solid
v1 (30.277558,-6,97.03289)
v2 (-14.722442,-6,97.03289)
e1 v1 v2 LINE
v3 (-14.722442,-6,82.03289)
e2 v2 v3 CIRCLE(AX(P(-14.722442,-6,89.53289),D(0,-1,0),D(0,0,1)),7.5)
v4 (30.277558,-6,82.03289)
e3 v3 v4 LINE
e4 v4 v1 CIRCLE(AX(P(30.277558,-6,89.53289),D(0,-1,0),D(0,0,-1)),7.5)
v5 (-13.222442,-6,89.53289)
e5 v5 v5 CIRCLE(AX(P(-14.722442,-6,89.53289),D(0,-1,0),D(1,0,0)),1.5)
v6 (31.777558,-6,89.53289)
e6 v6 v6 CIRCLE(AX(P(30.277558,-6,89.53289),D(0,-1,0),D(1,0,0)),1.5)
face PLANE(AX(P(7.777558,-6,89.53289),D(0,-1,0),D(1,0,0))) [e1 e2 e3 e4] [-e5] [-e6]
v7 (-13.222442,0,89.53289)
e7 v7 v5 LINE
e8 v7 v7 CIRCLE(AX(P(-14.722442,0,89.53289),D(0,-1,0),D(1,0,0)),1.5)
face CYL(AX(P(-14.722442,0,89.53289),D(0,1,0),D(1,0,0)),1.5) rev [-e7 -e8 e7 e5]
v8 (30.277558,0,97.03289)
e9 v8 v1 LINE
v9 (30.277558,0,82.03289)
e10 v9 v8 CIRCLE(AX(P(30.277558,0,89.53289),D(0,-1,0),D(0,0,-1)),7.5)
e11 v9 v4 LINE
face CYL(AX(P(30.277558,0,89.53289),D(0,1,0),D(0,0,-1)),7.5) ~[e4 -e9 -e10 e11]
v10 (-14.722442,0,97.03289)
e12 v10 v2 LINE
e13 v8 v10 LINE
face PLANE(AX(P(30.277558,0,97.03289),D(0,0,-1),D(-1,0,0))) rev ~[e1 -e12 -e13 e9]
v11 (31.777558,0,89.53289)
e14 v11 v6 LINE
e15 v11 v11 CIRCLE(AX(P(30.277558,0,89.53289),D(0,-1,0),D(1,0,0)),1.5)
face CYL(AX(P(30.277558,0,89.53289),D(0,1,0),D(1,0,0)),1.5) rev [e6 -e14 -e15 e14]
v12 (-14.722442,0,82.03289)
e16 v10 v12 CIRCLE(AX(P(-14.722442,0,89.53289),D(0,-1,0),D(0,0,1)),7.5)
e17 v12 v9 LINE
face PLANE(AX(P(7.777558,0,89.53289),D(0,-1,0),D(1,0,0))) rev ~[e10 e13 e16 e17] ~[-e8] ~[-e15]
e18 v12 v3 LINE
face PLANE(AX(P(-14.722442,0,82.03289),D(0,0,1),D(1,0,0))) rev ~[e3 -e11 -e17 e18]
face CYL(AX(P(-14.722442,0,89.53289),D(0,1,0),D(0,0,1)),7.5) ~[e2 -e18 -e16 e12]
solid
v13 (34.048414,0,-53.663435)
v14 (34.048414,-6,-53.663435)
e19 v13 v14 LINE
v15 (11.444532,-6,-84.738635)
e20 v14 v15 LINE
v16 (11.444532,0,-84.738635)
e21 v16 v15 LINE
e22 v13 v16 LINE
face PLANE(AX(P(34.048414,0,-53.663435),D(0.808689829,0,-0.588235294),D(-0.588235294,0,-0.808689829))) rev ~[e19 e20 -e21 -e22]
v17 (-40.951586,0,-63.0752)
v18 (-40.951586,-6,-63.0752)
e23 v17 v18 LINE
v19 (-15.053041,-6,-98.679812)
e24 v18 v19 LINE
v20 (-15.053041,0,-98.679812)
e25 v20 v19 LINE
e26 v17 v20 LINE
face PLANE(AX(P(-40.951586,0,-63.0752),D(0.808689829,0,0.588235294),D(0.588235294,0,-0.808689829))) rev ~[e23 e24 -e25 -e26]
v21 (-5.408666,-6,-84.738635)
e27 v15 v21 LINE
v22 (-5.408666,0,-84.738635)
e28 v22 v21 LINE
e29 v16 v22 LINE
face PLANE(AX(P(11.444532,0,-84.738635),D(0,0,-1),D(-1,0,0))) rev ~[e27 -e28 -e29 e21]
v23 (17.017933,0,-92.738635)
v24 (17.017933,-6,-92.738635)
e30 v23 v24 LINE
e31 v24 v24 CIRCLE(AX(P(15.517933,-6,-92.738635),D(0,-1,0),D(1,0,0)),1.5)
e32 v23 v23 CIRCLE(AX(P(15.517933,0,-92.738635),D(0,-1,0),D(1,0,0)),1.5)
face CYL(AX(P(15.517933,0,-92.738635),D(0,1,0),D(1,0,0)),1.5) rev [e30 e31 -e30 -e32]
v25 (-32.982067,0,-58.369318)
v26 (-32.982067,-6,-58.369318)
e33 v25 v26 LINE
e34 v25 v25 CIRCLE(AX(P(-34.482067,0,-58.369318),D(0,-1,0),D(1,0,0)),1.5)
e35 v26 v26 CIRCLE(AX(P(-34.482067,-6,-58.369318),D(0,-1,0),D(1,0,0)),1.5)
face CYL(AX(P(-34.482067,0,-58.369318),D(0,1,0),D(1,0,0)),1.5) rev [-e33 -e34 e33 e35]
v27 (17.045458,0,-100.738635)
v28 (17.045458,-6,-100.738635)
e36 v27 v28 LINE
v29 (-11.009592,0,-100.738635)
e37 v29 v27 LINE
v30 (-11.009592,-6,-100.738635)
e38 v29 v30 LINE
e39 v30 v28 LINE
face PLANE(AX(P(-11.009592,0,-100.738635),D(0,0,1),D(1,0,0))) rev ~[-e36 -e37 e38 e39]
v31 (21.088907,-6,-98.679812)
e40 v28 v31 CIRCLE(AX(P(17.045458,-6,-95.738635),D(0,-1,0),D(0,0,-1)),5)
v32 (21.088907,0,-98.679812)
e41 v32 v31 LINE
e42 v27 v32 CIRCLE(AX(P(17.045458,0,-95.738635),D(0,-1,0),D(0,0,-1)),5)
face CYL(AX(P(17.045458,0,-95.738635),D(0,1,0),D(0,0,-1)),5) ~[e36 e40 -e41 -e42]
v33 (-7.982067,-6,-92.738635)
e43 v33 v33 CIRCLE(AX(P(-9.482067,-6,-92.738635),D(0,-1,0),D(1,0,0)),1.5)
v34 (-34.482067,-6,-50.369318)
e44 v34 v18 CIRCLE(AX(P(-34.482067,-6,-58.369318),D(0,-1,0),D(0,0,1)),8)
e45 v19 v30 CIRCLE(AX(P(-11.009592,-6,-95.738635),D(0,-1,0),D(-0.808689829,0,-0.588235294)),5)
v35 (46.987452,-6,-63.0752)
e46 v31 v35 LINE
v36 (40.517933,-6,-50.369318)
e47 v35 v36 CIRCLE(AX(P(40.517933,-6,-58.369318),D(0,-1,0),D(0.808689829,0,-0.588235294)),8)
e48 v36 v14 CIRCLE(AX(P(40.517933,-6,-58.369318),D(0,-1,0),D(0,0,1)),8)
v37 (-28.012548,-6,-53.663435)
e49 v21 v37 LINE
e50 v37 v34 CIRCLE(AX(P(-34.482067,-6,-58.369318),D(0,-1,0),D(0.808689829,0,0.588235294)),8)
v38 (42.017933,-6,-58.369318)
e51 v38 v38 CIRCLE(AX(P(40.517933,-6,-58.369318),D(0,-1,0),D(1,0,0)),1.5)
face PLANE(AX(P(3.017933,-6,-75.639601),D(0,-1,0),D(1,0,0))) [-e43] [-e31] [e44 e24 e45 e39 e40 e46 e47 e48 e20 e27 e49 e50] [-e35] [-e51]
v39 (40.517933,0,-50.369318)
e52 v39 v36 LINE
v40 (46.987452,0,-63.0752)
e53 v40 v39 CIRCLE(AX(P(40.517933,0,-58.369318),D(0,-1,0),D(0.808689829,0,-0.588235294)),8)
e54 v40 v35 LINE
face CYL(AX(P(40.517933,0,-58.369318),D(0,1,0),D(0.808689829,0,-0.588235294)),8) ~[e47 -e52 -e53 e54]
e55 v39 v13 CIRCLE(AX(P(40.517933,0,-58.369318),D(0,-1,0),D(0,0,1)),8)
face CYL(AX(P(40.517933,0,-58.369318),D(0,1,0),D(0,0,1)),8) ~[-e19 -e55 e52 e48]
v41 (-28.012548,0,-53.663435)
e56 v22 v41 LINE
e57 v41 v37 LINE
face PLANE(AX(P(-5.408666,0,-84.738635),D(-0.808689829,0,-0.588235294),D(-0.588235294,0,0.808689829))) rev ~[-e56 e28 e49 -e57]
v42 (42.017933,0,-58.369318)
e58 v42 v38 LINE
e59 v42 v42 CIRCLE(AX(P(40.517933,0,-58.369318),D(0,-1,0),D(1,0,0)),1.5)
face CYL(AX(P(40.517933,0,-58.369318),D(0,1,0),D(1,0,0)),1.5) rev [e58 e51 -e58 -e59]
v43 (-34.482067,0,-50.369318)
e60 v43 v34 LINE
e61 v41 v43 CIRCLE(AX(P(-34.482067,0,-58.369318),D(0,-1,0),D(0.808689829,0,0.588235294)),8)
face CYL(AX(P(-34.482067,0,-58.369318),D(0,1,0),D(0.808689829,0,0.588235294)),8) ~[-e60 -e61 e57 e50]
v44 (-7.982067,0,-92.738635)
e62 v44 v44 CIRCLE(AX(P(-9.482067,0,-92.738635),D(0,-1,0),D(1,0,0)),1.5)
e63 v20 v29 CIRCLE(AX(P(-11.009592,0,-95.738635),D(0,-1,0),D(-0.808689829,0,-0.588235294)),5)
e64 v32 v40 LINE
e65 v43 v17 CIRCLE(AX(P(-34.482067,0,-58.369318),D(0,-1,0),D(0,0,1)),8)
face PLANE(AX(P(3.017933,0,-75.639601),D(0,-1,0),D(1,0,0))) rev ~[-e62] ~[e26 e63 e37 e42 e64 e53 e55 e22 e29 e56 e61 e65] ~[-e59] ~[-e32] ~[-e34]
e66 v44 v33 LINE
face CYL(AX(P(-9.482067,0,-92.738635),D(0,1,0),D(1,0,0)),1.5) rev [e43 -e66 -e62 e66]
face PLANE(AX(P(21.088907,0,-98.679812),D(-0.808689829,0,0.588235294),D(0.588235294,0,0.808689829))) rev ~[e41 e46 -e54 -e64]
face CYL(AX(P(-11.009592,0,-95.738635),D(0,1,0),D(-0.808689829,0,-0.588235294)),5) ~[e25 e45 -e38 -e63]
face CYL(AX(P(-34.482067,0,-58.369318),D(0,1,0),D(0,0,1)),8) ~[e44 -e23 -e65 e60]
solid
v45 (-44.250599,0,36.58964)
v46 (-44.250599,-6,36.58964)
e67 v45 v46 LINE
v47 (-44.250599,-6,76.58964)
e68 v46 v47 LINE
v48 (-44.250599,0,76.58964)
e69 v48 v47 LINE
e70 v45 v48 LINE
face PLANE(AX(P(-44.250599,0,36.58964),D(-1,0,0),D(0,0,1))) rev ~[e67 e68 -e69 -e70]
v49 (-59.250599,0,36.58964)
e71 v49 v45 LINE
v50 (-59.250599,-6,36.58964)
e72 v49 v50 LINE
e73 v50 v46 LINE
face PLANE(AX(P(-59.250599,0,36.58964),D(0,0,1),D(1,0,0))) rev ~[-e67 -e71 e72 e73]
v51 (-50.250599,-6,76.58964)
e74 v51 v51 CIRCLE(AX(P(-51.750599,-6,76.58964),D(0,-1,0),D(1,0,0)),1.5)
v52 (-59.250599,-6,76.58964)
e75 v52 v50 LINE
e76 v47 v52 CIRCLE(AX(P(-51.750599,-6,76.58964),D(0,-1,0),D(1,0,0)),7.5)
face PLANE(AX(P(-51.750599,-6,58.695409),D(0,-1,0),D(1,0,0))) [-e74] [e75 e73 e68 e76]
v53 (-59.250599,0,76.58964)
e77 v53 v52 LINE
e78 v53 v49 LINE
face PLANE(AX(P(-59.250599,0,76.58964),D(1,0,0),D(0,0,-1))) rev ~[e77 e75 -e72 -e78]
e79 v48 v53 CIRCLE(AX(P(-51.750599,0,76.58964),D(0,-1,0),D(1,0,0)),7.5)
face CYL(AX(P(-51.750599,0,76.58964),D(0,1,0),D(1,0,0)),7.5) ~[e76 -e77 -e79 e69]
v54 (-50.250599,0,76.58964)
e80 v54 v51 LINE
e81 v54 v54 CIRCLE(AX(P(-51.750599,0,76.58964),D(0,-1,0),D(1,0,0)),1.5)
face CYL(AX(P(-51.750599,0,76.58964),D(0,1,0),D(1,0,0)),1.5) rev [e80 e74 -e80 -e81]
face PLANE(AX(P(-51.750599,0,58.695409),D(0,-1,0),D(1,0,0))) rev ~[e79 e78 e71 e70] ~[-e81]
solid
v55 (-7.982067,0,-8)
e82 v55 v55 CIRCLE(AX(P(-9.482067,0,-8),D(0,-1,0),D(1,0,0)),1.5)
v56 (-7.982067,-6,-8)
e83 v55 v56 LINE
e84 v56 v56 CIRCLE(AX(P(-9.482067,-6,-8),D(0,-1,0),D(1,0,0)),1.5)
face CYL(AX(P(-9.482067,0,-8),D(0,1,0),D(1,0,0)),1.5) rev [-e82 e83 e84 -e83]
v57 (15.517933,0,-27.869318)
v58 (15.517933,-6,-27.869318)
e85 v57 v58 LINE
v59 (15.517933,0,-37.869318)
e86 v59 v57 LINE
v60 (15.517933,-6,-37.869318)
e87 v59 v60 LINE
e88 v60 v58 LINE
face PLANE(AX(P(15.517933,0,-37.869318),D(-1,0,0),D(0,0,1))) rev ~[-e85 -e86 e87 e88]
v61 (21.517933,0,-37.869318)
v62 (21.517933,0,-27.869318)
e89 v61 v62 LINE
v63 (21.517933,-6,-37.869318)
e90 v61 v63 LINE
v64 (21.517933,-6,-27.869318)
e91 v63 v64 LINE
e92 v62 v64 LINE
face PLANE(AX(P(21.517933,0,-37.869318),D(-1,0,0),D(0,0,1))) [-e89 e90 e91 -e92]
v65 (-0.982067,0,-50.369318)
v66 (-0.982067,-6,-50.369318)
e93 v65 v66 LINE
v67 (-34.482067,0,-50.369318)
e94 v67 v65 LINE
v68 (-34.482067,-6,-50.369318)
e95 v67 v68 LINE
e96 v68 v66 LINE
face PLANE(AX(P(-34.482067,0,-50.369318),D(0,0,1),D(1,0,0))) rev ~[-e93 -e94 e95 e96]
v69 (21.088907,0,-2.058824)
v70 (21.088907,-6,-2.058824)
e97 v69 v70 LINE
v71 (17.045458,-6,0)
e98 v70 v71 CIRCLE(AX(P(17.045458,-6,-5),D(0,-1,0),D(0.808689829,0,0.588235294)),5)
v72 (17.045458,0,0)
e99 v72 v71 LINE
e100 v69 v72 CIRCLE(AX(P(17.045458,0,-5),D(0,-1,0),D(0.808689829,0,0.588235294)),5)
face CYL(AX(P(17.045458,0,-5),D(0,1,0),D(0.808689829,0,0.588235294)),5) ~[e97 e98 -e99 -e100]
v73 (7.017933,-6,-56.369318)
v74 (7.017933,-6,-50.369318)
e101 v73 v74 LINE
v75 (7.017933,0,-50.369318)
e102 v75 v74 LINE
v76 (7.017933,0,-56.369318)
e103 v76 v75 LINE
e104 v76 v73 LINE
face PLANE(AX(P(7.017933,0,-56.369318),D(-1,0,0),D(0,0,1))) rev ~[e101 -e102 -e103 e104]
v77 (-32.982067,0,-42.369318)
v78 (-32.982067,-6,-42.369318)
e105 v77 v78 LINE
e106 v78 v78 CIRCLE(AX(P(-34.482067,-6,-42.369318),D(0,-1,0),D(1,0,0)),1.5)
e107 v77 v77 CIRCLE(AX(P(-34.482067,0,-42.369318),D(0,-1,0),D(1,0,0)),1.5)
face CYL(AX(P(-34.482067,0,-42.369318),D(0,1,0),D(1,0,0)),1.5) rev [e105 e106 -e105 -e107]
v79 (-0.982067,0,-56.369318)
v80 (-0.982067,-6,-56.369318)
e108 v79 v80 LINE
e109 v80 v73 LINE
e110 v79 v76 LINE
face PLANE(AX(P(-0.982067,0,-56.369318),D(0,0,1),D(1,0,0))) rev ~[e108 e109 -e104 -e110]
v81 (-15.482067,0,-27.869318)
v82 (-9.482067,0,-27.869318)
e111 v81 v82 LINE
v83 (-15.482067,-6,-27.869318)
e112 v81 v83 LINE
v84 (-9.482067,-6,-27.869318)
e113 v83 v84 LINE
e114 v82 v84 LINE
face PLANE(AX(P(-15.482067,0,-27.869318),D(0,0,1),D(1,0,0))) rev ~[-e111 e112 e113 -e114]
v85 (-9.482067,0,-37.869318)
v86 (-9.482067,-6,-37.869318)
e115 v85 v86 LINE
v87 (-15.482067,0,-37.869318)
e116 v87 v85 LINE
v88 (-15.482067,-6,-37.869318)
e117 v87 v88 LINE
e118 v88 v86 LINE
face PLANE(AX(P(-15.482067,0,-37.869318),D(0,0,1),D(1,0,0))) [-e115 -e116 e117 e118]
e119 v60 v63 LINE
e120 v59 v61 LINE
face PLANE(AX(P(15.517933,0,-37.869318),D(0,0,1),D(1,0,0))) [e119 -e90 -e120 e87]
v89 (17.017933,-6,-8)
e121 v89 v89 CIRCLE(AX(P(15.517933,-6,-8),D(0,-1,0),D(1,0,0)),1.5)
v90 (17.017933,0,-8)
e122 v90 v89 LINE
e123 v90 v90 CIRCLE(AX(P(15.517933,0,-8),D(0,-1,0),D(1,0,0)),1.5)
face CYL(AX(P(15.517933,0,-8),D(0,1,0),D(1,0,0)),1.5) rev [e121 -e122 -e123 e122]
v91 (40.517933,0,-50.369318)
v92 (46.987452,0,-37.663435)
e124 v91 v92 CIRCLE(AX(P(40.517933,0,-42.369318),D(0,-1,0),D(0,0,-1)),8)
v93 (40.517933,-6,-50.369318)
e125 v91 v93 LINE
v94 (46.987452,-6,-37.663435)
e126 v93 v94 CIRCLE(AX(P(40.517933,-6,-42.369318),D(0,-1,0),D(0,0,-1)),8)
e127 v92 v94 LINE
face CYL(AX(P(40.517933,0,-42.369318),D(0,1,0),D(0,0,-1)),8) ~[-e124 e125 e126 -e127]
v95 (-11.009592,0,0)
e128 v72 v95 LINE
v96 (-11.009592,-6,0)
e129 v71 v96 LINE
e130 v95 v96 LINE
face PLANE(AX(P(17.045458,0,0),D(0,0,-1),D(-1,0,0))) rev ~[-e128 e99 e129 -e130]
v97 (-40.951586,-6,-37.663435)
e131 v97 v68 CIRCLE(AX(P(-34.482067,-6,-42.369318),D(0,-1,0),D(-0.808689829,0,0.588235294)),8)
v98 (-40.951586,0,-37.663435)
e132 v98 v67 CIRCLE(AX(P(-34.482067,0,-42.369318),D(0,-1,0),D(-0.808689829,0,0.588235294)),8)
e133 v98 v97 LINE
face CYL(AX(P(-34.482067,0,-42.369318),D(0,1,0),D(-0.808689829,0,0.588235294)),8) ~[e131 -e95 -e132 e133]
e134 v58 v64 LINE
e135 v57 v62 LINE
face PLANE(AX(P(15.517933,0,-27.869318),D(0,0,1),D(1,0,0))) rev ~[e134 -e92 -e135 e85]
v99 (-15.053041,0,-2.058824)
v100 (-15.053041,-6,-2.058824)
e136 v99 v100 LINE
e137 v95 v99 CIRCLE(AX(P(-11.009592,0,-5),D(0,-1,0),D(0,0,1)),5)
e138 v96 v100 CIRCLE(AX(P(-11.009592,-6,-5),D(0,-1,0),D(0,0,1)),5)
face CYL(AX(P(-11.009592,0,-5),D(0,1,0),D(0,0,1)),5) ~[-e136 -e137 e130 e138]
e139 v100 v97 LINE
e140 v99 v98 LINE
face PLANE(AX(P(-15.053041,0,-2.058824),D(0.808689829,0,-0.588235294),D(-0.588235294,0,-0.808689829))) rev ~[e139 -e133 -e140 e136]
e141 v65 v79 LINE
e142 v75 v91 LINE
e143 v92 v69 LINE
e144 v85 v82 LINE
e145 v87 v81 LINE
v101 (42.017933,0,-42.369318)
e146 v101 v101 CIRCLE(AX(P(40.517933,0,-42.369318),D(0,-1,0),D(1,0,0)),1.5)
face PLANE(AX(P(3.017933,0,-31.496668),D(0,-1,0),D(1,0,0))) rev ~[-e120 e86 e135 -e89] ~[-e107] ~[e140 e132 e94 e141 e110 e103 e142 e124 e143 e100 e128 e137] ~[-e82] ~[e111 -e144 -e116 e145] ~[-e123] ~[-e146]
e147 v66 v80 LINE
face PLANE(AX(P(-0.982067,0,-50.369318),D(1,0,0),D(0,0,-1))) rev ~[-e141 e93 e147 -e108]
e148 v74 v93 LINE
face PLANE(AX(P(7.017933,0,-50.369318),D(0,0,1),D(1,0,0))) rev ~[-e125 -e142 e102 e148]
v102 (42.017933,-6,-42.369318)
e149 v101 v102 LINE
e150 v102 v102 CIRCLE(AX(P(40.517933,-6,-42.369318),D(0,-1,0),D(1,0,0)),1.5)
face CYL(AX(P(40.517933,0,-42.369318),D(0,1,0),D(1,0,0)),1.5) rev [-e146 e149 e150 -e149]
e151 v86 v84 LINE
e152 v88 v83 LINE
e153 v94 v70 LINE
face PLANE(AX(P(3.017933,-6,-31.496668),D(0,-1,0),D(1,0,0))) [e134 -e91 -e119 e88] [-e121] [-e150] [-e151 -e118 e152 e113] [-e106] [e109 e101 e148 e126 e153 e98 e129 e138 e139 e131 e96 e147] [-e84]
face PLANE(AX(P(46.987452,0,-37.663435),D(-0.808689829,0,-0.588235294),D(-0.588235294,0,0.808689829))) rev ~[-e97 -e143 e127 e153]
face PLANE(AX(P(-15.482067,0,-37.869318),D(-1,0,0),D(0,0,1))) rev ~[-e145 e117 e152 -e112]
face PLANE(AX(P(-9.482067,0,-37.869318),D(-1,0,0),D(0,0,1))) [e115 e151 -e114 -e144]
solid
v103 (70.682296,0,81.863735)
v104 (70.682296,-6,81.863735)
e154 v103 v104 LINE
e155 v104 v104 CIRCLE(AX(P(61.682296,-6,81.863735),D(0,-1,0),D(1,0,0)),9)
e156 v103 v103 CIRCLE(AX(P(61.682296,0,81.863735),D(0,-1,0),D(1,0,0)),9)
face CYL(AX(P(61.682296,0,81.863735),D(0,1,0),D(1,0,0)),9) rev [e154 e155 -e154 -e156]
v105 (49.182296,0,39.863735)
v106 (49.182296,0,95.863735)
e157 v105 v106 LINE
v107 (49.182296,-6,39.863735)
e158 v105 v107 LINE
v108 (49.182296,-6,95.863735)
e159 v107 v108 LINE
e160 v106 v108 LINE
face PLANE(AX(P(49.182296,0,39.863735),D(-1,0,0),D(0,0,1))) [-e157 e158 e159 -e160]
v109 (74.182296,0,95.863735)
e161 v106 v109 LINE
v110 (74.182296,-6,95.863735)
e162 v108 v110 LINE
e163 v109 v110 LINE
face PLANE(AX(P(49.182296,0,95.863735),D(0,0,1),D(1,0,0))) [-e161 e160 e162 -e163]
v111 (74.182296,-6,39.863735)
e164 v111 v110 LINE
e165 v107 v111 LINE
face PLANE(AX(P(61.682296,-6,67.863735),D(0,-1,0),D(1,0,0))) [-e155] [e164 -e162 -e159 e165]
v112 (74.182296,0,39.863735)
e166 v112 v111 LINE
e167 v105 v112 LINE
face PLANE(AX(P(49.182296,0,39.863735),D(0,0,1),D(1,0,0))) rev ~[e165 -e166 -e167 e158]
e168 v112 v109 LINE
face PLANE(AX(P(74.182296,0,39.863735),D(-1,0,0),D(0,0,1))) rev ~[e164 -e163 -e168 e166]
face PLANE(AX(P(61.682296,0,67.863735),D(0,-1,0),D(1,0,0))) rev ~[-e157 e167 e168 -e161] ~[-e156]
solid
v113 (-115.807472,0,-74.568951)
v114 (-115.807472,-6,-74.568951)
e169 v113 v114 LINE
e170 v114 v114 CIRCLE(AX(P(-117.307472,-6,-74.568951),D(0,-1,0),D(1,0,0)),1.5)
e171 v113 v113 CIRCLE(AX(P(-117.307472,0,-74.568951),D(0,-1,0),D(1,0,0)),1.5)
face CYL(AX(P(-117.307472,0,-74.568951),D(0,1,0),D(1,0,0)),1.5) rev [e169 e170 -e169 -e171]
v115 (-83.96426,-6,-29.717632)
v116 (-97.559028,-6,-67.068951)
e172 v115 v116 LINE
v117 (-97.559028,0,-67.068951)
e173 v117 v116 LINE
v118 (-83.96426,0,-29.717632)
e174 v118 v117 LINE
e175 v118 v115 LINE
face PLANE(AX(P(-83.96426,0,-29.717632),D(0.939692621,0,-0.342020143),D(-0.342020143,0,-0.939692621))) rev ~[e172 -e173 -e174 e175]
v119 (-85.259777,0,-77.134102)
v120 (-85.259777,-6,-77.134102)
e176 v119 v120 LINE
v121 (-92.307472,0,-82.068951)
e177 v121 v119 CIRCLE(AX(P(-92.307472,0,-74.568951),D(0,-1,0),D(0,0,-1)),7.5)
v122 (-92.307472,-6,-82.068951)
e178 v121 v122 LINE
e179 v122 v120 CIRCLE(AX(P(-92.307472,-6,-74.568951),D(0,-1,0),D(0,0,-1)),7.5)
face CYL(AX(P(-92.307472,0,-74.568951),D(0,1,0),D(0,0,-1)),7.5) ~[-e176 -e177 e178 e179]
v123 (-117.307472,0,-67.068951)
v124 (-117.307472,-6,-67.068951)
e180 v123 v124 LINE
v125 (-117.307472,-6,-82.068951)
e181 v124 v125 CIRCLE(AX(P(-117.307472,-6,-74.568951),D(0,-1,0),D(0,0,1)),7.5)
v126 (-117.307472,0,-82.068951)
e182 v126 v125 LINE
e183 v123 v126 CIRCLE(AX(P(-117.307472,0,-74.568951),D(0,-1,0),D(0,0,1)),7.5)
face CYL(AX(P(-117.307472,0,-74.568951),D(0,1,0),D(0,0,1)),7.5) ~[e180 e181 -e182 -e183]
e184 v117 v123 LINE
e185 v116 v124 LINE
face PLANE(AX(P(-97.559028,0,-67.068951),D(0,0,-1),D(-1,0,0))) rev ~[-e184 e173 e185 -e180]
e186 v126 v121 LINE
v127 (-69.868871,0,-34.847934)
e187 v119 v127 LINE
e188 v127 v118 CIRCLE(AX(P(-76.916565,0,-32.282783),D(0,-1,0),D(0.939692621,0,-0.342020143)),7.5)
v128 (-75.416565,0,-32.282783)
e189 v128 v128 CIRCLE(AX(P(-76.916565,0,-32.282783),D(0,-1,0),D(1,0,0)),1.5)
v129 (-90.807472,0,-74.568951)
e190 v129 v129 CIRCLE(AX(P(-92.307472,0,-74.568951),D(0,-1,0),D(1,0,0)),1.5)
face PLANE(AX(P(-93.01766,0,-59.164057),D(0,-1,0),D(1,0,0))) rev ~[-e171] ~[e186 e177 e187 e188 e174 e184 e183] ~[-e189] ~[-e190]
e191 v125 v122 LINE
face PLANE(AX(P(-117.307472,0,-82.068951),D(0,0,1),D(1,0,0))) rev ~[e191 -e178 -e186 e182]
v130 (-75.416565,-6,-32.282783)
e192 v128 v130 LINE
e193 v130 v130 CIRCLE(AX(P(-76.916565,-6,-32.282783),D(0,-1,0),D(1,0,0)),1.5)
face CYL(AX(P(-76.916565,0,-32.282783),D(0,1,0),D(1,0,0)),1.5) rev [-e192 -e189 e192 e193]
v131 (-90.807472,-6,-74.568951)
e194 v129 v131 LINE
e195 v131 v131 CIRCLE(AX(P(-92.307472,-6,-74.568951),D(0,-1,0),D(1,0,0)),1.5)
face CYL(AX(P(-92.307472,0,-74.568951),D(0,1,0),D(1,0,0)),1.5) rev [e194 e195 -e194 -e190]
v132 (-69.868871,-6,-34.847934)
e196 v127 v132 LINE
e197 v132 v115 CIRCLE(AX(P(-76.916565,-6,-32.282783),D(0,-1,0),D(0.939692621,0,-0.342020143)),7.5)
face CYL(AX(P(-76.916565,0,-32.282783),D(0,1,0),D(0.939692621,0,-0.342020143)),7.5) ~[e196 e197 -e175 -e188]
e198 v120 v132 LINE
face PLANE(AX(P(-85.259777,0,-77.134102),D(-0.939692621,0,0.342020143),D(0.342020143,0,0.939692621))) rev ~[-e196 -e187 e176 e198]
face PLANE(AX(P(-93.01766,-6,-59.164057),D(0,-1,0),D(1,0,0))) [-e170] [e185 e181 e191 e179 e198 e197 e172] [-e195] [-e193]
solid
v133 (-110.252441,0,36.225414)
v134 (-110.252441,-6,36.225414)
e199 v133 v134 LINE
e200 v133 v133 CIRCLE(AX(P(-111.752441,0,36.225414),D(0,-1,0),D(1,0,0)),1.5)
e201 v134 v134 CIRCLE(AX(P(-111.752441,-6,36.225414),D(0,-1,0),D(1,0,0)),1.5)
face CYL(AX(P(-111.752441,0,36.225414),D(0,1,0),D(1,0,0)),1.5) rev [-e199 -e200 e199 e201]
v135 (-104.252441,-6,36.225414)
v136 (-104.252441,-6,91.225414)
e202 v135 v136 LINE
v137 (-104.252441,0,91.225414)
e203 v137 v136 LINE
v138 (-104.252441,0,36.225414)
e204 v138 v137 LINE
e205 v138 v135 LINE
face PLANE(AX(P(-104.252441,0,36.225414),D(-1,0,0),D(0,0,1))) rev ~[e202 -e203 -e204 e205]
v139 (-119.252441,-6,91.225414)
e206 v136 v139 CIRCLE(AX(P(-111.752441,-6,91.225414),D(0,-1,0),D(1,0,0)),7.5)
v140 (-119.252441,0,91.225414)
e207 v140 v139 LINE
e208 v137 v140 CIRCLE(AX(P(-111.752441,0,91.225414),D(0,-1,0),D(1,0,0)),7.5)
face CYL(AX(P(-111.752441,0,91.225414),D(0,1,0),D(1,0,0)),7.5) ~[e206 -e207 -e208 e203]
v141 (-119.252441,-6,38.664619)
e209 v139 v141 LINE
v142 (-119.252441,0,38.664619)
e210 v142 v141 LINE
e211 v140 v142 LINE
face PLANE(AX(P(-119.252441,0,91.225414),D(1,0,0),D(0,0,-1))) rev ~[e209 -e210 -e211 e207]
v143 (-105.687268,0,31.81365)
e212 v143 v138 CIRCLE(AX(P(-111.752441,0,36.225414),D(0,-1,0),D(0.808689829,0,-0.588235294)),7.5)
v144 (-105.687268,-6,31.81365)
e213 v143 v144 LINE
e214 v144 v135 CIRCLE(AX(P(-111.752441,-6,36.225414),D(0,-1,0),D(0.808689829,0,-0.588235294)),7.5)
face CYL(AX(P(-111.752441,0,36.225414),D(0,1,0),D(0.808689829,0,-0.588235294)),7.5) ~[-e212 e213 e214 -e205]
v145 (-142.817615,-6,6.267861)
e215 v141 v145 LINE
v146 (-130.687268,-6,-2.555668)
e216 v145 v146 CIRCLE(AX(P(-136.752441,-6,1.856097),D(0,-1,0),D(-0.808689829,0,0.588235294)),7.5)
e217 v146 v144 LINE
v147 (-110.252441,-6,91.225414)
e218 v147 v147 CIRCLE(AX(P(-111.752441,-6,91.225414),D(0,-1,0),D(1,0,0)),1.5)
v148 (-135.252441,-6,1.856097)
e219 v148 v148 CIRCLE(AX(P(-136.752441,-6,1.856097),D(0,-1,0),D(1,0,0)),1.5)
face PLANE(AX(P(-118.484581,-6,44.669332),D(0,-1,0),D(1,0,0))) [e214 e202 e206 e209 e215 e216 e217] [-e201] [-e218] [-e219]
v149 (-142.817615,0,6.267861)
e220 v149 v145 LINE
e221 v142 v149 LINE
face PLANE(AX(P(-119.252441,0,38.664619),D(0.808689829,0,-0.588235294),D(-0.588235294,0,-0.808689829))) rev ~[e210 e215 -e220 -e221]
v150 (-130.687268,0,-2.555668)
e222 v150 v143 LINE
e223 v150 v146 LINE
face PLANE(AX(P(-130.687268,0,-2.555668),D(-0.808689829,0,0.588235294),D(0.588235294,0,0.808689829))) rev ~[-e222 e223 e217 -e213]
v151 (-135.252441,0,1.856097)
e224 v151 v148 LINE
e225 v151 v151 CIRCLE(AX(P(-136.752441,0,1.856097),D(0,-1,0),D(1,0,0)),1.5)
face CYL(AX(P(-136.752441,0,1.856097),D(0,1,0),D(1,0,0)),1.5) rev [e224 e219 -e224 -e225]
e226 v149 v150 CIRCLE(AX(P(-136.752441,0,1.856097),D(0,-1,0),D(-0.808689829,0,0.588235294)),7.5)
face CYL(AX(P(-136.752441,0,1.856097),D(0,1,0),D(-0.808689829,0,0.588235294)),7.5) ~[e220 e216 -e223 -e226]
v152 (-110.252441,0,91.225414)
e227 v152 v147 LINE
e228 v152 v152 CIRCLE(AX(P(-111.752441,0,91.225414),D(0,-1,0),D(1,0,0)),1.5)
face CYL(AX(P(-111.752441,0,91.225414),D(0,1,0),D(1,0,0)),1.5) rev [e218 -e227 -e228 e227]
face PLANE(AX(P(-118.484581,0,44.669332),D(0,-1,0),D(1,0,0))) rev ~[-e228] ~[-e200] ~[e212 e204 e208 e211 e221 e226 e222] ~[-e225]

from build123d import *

# Parameters (mm, degrees)
F0_R     = 1.5
F1_DEPTH = 6
F0_W     = 25
F0_H     = 56
F0_R_2   = 9
F0_W_2   = 6
F0_H_2   = 10
F2_DEPTH = 6


with BuildPart() as f1:
    # F0 (on Front) → F1 (new body)
    with BuildSketch(Plane.XZ):
        with BuildLine():
            ThreePointArc((-105.687267783, 31.8136496476), (-104.6201626586, 33.9058026246), (-104.2524414969, 36.2254143535))
            Line((-104.2524414969, 36.2254143535), (-104.2524414969, 91.2254143535))
            ThreePointArc((-104.2524414969, 91.2254143535), (-111.7524414969, 98.7254143535), (-119.2524414969, 91.2254143535))
            Line((-119.2524414969, 91.2254143535), (-119.2524414969, 38.6646190399))
            Line((-119.2524414969, 38.6646190399), (-142.8176152108, 6.2678613472))
            ThreePointArc((-142.8176152108, 6.2678613472), (-141.1642062028, -4.2090770726), (-130.687267783, -2.5556680645))
            Line((-130.687267783, -2.5556680645), (-105.687267783, 31.8136496476))
        make_face()
        with Locations((-136.7524414969, 1.8560966413)):
            Circle(F0_R, mode=Mode.SUBTRACT)
        with Locations((-111.7524414969, 36.2254143535)):
            Circle(F0_R, mode=Mode.SUBTRACT)
        with Locations((-111.7524414969, 91.2254143535)):
            Circle(F0_R, mode=Mode.SUBTRACT)
    extrude(amount=F1_DEPTH)


with BuildPart() as f1b:
    # F0 (on Front) → F1, piece 2 (new body)
    with BuildSketch(Plane.XZ):
        with BuildLine():
            ThreePointArc((-44.2505994937, 76.5896396789), (-51.7505994937, 84.0896396789), (-59.2505994937, 76.5896396789))
            Line((-59.2505994937, 76.5896396789), (-59.2505994937, 36.5896396789))
            Line((-59.2505994937, 36.5896396789), (-44.2505994937, 36.5896396789))
            Line((-44.2505994937, 36.5896396789), (-44.2505994937, 76.5896396789))
        make_face()
        with Locations((-51.7505994937, 76.5896396789)):
            Circle(F0_R, mode=Mode.SUBTRACT)
    extrude(amount=F1_DEPTH)


with BuildPart() as f1c:
    # F0 (on Front) → F1, piece 3 (new body)
    with BuildSketch(Plane.XZ):
        with BuildLine():
            ThreePointArc((-14.7224422544, 97.0328903141), (-22.2224422544, 89.5328903141), (-14.7224422544, 82.0328903141))
            Line((-14.7224422544, 82.0328903141), (30.2775577456, 82.0328903141))
            ThreePointArc((30.2775577456, 82.0328903141), (37.7775577456, 89.5328903141), (30.2775577456, 97.0328903141))
            Line((30.2775577456, 97.0328903141), (-14.7224422544, 97.0328903141))
        make_face()
        with Locations((-14.7224422544, 89.5328903141)):
            Circle(F0_R, mode=Mode.SUBTRACT)
        with Locations((30.2775577456, 89.5328903141)):
            Circle(F0_R, mode=Mode.SUBTRACT)
    extrude(amount=F1_DEPTH)


with BuildPart() as f1d:
    # F0 (on Front) → F1, piece 4 (new body)
    with BuildSketch(Plane.XZ):
        with BuildLine():
            ThreePointArc((-69.8688708126, -34.8479340648), (-74.3514143936, -25.2350883339), (-83.9642601244, -29.7176319149))
            Line((-83.9642601244, -29.7176319149), (-97.5590284548, -67.0689509252))
            Line((-97.5590284548, -67.0689509252), (-117.3074719182, -67.0689509252))
            ThreePointArc((-117.3074719182, -67.0689509252), (-124.8074719182, -74.5689509252), (-117.3074719182, -82.0689509252))
            Line((-117.3074719182, -82.0689509252), (-92.3074719182, -82.0689509252))
            ThreePointArc((-92.3074719182, -82.0689509252), (-88.0056486456, -80.7125912574), (-85.2597772623, -77.1341020002))
            Line((-85.2597772623, -77.1341020002), (-69.8688708126, -34.8479340648))
        make_face()
        with Locations((-117.3074719182, -74.5689509252)):
            Circle(F0_R, mode=Mode.SUBTRACT)
        with Locations((-92.3074719182, -74.5689509252)):
            Circle(F0_R, mode=Mode.SUBTRACT)
        with Locations((-76.9165654685, -32.2827829898)):
            Circle(F0_R, mode=Mode.SUBTRACT)
    extrude(amount=F1_DEPTH)


with BuildPart() as f1e:
    # F0 (on Front) → F1, piece 5 (new body)
    with BuildSketch(Plane.XZ):
        with Locations((61.6822957993, 67.8637354374)):
            Rectangle(F0_W, F0_H)
        with Locations((61.6822957993, 81.8637354374)):
            Circle(F0_R_2, mode=Mode.SUBTRACT)
    extrude(amount=F1_DEPTH)


with BuildPart() as f1f:
    # F0 (on Front) → F1, piece 6 (new body)
    with BuildSketch(Plane.XZ):
        with BuildLine():
            ThreePointArc((-28.0125484861, -53.6634353592), (-30.8521262624, -51.2402554027), (-34.4820671142, -50.3693177122))
            ThreePointArc((-34.4820671142, -50.3693177122), (-41.6111294237, -54.7393768603), (-40.9515857424, -63.0752000651))
            Line((-40.9515857424, -63.0752000651), (-15.0530414885, -98.6798118949))
            ThreePointArc((-15.0530414885, -98.6798118949), (-13.2783053783, -100.1942993677), (-11.0095923459, -100.7386354243))
            Line((-11.0095923459, -100.7386354243), (3.0179328858, -100.7386354243))
            Line((3.0179328858, -100.7386354243), (17.0454581174, -100.7386354243))
            ThreePointArc((17.0454581174, -100.7386354243), (19.3141711498, -100.1942993677), (21.08890726, -98.6798118949))
            Line((21.08890726, -98.6798118949), (46.9874515139, -63.0752000651))
            ThreePointArc((46.9874515139, -63.0752000651), (47.6469951952, -54.7393768603), (40.5179328858, -50.3693177122))
            ThreePointArc((40.5179328858, -50.3693177122), (36.8879920339, -51.2402554027), (34.0484142576, -53.6634353592))
            Line((34.0484142576, -53.6634353592), (11.444532268, -84.7386354243))
            Line((11.444532268, -84.7386354243), (3.0179328858, -84.7386354243))
            Line((3.0179328858, -84.7386354243), (-5.4086664965, -84.7386354243))
            Line((-5.4086664965, -84.7386354243), (-28.0125484861, -53.6634353592))
        make_face()
        with Locations((-9.4820671142, -92.7386354243)):
            Circle(F0_R, mode=Mode.SUBTRACT)
        with Locations((-34.4820671142, -58.3693177122)):
            Circle(F0_R, mode=Mode.SUBTRACT)
        with Locations((15.5179328858, -92.7386354243)):
            Circle(F0_R, mode=Mode.SUBTRACT)
        with Locations((40.5179328858, -58.3693177122)):
            Circle(F0_R, mode=Mode.SUBTRACT)
    extrude(amount=F1_DEPTH)


with BuildPart() as f2:
    # F0 (on Front) → F2 (new body)
    with BuildSketch(Plane.XZ):
        with BuildLine():
            Line((17.0454581174, 0), (3.0179328858, 0))
            Line((3.0179328858, 0), (-11.0095923459, 0))
            ThreePointArc((-11.0095923459, 0), (-13.2783053783, -0.5443360566), (-15.0530414885, -2.0588235294))
            Line((-15.0530414885, -2.0588235294), (-40.9515857424, -37.6634353592))
            ThreePointArc((-40.9515857424, -37.6634353592), (-41.6111294237, -45.9992585641), (-34.4820671142, -50.3693177122))
            Line((-34.4820671142, -50.3693177122), (-0.9820671142, -50.3693177122))
            Line((-0.9820671142, -50.3693177122), (-0.9820671142, -56.3693177122))
            Line((-0.9820671142, -56.3693177122), (7.0179328858, -56.3693177122))
            Line((7.0179328858, -56.3693177122), (7.0179328858, -50.3693177122))
            Line((7.0179328858, -50.3693177122), (40.5179328858, -50.3693177122))
            ThreePointArc((40.5179328858, -50.3693177122), (47.6469951952, -45.9992585641), (46.9874515139, -37.6634353592))
            Line((46.9874515139, -37.6634353592), (21.08890726, -2.0588235294))
            ThreePointArc((21.08890726, -2.0588235294), (19.3141711498, -0.5443360566), (17.0454581174, 0))
        make_face()
        with Locations((-34.4820671142, -42.3693177122)):
            Circle(F0_R, mode=Mode.SUBTRACT)
        with Locations((-12.4820671142, -32.8693177122)):
            Rectangle(F0_W_2, F0_H_2, mode=Mode.SUBTRACT)
        with Locations((-9.4820671142, -8)):
            Circle(F0_R, mode=Mode.SUBTRACT)
        with Locations((18.5179328858, -32.8693177122)):
            Rectangle(F0_W_2, F0_H_2, mode=Mode.SUBTRACT)
        with Locations((40.5179328858, -42.3693177122)):
            Circle(F0_R, mode=Mode.SUBTRACT)
        with Locations((15.5179328858, -8)):
            Circle(F0_R, mode=Mode.SUBTRACT)
    extrude(amount=F2_DEPTH)


solid = Compound([f1.part, f1b.part, f1c.part, f1d.part, f1e.part, f1f.part, f2.part])
